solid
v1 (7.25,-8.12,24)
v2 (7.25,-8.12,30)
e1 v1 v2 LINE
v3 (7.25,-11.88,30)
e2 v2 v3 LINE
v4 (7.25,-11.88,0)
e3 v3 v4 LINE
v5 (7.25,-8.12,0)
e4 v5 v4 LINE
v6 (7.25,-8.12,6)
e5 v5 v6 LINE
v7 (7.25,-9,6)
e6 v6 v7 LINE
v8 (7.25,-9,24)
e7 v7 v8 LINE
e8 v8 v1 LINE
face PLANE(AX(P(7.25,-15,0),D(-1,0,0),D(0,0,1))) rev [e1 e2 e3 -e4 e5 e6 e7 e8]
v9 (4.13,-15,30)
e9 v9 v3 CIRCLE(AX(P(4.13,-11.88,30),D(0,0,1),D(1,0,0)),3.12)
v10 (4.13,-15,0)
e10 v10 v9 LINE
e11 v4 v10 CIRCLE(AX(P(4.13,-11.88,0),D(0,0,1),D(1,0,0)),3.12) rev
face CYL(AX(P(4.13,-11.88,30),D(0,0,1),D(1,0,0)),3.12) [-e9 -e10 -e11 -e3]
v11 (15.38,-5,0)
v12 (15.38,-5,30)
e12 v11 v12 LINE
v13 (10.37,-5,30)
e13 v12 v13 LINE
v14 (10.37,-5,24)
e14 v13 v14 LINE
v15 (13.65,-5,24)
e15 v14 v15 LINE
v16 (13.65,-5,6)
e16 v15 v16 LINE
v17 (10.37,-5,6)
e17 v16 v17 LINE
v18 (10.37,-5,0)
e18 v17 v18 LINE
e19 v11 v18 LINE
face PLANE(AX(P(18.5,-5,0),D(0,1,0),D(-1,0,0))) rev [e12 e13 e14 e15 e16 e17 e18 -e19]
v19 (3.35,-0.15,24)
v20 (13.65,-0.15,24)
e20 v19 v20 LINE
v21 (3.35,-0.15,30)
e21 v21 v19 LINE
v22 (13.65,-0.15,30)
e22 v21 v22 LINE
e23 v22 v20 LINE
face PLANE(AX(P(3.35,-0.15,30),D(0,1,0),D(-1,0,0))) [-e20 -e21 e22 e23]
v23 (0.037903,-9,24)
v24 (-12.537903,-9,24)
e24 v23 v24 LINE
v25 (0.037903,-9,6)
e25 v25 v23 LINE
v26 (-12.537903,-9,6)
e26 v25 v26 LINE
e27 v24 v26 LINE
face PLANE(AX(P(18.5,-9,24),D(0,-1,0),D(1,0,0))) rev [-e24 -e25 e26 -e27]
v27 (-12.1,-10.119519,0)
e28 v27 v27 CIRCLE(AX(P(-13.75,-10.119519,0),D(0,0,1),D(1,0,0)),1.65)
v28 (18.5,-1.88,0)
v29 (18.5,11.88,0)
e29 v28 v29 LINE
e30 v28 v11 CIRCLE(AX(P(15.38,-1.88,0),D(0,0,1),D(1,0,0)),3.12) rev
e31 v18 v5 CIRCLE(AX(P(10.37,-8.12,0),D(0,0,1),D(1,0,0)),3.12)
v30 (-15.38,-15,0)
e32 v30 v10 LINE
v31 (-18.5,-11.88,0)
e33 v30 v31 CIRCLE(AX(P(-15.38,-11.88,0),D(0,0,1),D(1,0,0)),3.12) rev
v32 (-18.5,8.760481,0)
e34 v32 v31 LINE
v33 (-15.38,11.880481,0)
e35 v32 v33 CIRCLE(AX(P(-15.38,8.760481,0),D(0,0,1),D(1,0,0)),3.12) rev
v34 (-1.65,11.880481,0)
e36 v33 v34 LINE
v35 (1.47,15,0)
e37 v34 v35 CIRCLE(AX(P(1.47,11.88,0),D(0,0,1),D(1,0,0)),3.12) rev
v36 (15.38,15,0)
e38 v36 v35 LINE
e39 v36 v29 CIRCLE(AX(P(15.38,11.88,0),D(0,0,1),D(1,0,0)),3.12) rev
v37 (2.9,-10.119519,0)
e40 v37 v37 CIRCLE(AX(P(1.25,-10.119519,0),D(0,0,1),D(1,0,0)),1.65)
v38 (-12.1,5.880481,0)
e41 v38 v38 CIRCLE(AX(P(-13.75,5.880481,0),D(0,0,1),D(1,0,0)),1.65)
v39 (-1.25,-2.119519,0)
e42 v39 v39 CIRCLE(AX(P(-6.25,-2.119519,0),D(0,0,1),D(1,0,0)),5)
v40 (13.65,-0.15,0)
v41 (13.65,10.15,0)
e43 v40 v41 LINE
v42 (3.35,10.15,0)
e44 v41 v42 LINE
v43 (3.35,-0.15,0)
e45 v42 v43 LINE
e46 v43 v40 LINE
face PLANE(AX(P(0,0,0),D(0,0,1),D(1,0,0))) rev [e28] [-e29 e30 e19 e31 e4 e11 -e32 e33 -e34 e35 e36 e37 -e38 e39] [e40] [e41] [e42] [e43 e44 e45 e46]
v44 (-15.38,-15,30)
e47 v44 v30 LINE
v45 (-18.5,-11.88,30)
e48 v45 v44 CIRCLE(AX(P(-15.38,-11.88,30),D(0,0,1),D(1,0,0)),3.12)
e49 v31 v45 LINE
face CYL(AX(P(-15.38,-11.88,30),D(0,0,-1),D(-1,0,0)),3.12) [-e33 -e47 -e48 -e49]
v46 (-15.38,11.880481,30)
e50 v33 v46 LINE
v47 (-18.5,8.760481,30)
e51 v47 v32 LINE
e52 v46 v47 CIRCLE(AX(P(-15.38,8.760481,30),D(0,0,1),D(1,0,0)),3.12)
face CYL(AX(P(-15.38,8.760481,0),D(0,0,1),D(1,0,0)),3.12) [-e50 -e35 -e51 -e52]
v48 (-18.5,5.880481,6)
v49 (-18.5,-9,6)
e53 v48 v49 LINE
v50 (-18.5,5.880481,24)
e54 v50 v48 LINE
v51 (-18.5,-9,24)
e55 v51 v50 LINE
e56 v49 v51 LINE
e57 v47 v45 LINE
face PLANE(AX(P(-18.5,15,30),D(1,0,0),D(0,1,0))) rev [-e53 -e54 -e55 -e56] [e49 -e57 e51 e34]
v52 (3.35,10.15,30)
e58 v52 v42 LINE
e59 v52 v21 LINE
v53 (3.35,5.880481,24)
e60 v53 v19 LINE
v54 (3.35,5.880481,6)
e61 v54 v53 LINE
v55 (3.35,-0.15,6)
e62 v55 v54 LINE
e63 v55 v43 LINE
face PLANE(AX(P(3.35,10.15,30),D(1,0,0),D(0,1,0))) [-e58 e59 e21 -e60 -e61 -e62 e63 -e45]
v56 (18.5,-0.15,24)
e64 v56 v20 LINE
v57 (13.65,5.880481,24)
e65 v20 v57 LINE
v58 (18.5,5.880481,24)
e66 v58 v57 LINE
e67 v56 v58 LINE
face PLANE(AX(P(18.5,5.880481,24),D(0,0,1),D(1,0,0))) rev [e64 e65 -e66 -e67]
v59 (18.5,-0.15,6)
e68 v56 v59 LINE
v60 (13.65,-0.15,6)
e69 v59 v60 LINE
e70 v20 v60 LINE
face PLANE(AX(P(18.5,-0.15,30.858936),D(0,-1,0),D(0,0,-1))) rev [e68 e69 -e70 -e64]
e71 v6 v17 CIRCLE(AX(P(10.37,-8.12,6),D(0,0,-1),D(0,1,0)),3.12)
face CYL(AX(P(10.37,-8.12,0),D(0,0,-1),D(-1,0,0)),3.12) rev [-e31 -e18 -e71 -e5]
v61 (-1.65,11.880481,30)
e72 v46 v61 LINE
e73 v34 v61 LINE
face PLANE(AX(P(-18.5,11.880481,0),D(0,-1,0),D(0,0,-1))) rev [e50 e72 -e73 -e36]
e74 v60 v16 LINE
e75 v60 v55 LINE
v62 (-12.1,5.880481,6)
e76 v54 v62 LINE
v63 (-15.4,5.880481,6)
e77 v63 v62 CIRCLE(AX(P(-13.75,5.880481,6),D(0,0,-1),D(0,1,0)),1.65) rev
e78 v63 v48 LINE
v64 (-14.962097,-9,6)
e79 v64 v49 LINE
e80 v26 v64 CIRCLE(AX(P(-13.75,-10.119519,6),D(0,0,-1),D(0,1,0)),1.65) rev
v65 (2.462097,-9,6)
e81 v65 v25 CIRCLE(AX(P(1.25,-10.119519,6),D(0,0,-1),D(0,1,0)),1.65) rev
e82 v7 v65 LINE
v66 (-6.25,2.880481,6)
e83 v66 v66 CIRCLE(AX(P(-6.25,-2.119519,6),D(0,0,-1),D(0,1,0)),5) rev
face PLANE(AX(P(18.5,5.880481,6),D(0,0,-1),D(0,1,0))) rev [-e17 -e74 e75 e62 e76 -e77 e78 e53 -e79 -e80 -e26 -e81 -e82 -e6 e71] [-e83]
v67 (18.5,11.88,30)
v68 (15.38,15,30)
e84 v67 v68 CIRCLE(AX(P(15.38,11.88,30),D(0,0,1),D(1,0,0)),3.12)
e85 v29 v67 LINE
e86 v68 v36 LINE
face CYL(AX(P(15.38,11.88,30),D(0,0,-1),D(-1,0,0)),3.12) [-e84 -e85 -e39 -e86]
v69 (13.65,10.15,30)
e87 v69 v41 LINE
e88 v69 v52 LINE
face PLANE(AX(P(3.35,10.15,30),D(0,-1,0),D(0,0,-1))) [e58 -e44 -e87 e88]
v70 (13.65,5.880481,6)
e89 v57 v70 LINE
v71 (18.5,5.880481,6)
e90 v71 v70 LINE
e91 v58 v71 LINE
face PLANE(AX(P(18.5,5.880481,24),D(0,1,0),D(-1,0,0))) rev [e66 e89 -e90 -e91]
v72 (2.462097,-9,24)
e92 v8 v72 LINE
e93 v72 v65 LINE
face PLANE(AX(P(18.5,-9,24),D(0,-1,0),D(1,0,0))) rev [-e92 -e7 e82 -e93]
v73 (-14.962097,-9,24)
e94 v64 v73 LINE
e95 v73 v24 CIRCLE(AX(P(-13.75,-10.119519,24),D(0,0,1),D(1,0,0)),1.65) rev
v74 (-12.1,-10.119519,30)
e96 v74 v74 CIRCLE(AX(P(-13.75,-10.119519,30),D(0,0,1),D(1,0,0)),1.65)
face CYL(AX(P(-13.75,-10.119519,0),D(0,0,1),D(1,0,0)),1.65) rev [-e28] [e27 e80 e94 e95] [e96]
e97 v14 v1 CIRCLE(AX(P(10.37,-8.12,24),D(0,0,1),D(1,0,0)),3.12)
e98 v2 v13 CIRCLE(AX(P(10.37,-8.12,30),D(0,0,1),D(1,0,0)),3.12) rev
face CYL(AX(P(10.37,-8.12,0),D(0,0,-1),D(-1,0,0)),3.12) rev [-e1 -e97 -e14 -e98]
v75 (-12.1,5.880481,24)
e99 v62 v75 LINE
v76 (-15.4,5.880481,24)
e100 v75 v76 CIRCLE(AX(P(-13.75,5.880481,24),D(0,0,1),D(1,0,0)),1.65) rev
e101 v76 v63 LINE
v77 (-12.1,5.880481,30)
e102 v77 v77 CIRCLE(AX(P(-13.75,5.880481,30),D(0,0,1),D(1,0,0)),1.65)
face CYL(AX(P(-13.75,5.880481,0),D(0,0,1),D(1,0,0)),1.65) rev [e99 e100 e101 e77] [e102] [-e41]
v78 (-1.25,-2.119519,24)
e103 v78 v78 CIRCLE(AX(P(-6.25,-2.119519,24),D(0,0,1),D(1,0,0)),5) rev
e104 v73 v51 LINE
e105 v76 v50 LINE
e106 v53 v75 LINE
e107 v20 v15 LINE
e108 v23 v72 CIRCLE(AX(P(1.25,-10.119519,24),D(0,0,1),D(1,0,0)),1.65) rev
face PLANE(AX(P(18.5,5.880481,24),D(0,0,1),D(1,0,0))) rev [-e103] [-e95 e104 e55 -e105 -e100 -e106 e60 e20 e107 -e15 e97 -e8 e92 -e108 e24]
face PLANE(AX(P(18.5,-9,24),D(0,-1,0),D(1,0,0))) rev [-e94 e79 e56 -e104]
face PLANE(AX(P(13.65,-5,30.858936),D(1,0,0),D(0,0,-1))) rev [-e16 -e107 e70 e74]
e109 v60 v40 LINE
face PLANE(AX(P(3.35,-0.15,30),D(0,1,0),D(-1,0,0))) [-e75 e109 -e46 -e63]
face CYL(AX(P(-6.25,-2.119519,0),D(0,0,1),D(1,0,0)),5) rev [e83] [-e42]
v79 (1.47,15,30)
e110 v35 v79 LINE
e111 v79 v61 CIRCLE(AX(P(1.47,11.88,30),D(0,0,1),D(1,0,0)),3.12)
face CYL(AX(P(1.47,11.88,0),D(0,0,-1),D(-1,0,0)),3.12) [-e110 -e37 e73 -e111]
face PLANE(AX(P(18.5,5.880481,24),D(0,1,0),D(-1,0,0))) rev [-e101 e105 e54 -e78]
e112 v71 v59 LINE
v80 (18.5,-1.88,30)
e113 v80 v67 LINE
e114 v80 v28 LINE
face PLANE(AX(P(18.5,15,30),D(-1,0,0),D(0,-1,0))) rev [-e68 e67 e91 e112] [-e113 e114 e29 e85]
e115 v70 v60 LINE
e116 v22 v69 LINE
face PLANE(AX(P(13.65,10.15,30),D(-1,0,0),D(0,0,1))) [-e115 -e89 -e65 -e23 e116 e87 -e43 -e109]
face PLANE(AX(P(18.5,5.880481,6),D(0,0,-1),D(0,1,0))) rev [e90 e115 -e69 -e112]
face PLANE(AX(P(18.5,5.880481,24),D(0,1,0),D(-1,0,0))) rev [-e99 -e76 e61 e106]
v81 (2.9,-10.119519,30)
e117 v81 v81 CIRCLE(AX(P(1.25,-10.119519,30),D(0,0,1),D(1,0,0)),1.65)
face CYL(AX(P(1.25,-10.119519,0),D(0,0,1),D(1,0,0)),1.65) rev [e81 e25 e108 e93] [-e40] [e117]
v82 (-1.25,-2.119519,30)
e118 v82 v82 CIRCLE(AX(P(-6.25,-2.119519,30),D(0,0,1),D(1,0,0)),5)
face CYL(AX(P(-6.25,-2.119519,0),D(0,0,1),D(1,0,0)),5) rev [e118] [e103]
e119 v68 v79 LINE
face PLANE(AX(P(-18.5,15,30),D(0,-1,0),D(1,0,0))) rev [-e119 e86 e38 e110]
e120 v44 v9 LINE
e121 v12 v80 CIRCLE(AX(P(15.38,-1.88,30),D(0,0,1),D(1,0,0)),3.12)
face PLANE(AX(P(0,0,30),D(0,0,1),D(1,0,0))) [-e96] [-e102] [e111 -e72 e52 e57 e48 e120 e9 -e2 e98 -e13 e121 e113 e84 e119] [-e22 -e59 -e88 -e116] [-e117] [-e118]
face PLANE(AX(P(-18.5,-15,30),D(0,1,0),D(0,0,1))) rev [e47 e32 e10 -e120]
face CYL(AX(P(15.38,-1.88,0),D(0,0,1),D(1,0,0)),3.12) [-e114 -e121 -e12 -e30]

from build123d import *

# Parameters (mm, degrees)
SKETCH_1_W          = 37
SKETCH_1_H          = 30
SKETCH_1_W_2        = 10.3
SKETCH_1_H_2        = 10.3
EXTRUDE_1_DEPTH     = 30
SKETCH_2_R          = 1.65
SKETCH_2_W          = 11.25
SKETCH_2_H          = 10
CUT_EXTRUDE_1_DEPTH = 39.304699451
SKETCH_3_R          = 5
SKETCH_3_W          = 16.85
SKETCH_3_H          = 3.119518618
CUT_EXTRUDE_2_DEPTH = 39.304699451
SKETCH_4_W          = 18
SKETCH_4_H          = 14.880481382
CUT_EXTRUDE_3_DEPTH = 50.939963957
SKETCH_5_W          = 4.85
SKETCH_5_H          = 4.85
EXTRUDE_2_DEPTH     = 18
FILLET_2_R          = 3.12


with BuildPart() as part:
    # 草图1 → 凸台-拉伸1 (new body)
    with BuildSketch(Plane.XY):
        Rectangle(SKETCH_1_W, SKETCH_1_H)
        with Locations((8.5, 5)):
            Rectangle(SKETCH_1_W_2, SKETCH_1_H_2, mode=Mode.SUBTRACT)
    extrude(amount=EXTRUDE_1_DEPTH)

    # 草图2 → 切除-拉伸1 (cut, through all)
    with BuildSketch(Plane.XY.offset(30)):
        with Locations((-13.75, 5.880481382)):
            Circle(SKETCH_2_R)
        with Locations((-13.75, -10.119518618)):
            Circle(SKETCH_2_R)
        with Locations((1.25, -10.119518618)):
            Circle(SKETCH_2_R)
        with Locations((12.875, -10)):
            Rectangle(SKETCH_2_W, SKETCH_2_H)
    extrude(amount=-CUT_EXTRUDE_1_DEPTH, mode=Mode.SUBTRACT)

    # 草图3 → 切除-拉伸2 (cut, through all)
    with BuildSketch(Plane.XY.offset(30)):
        with Locations((-6.25, -2.119518618)):
            Circle(SKETCH_3_R)
        with Locations((-10.075, 13.440240691)):
            Rectangle(SKETCH_3_W, SKETCH_3_H)
    extrude(amount=-CUT_EXTRUDE_2_DEPTH, mode=Mode.SUBTRACT)

    # 草图4 → 切除-拉伸3 (cut, through all)
    with BuildSketch(Plane.ZY.offset(18.5)):
        with Locations((15, -1.559759309)):
            Rectangle(SKETCH_4_W, SKETCH_4_H)
    extrude(amount=-CUT_EXTRUDE_3_DEPTH, mode=Mode.SUBTRACT)

    # 草图5 → 凸台-拉伸2 (add)
    with BuildSketch(Plane.XY.offset(6)):
        with Locations((16.075, -2.575)):
            Rectangle(SKETCH_5_W, SKETCH_5_H)
    extrude(amount=EXTRUDE_2_DEPTH)

    # 圆角2
    # the kernel refuses this fillet: 3.12 mm, written as the material it adds along each edge
    with BuildSketch(Plane(origin=(7.25, -5, 6), x_dir=(0, -1, 0), z_dir=(0, 0, -1)), Plane(origin=(7.25, -5, 30), x_dir=(0, -1, 0), z_dir=(0, 0, -1))) as fillet_2_piece_1:
        with BuildLine():
            CenterArc((FILLET_2_R, -FILLET_2_R), FILLET_2_R, 90, 90)
            Line((0, -FILLET_2_R), (0, 0))
            Line((0, 0), (FILLET_2_R, 0))
        make_face()
    extrude(amount=6)
    # the kernel refuses this fillet: 3.12 mm, written as the material it takes off along each edge
    with BuildSketch(Plane(origin=(-1.65, 15, 37.8), x_dir=(1, 0, 0), z_dir=(0, 0, -1)), Plane(origin=(-18.5, 11.880481382, 37.8), x_dir=(1, 0, 0), z_dir=(0, 0, -1)), Plane(origin=(18.5, 15, -7.8), x_dir=(-1, 0, 0), z_dir=(0, 0, 1)), Plane(origin=(7.25, -15, 37.8), x_dir=(-1, 0, 0), z_dir=(0, 0, -1)), Plane(origin=(-18.5, -15, -7.8), x_dir=(1, 0, 0), z_dir=(0, 0, 1))) as fillet_2_2_piece_1:
        with BuildLine():
            CenterArc((FILLET_2_R, FILLET_2_R), FILLET_2_R, 180, 90)
            Line((0, FILLET_2_R), (0, 0))
            Line((0, 0), (FILLET_2_R, 0))
        make_face()
    extrude(amount=45.6, mode=Mode.SUBTRACT)
    with BuildSketch(Plane(origin=(18.5, -5, 37.8), x_dir=(0, 1, 0), z_dir=(0, 0, -1))) as fillet_2_2_piece_2:
        with BuildLine():
            CenterArc((FILLET_2_R, -FILLET_2_R), FILLET_2_R, 90, 90)
            Line((0, -FILLET_2_R), (0, 0))
            Line((0, 0), (FILLET_2_R, 0))
        make_face()
    extrude(amount=45.6, mode=Mode.SUBTRACT)


solid = part.part
